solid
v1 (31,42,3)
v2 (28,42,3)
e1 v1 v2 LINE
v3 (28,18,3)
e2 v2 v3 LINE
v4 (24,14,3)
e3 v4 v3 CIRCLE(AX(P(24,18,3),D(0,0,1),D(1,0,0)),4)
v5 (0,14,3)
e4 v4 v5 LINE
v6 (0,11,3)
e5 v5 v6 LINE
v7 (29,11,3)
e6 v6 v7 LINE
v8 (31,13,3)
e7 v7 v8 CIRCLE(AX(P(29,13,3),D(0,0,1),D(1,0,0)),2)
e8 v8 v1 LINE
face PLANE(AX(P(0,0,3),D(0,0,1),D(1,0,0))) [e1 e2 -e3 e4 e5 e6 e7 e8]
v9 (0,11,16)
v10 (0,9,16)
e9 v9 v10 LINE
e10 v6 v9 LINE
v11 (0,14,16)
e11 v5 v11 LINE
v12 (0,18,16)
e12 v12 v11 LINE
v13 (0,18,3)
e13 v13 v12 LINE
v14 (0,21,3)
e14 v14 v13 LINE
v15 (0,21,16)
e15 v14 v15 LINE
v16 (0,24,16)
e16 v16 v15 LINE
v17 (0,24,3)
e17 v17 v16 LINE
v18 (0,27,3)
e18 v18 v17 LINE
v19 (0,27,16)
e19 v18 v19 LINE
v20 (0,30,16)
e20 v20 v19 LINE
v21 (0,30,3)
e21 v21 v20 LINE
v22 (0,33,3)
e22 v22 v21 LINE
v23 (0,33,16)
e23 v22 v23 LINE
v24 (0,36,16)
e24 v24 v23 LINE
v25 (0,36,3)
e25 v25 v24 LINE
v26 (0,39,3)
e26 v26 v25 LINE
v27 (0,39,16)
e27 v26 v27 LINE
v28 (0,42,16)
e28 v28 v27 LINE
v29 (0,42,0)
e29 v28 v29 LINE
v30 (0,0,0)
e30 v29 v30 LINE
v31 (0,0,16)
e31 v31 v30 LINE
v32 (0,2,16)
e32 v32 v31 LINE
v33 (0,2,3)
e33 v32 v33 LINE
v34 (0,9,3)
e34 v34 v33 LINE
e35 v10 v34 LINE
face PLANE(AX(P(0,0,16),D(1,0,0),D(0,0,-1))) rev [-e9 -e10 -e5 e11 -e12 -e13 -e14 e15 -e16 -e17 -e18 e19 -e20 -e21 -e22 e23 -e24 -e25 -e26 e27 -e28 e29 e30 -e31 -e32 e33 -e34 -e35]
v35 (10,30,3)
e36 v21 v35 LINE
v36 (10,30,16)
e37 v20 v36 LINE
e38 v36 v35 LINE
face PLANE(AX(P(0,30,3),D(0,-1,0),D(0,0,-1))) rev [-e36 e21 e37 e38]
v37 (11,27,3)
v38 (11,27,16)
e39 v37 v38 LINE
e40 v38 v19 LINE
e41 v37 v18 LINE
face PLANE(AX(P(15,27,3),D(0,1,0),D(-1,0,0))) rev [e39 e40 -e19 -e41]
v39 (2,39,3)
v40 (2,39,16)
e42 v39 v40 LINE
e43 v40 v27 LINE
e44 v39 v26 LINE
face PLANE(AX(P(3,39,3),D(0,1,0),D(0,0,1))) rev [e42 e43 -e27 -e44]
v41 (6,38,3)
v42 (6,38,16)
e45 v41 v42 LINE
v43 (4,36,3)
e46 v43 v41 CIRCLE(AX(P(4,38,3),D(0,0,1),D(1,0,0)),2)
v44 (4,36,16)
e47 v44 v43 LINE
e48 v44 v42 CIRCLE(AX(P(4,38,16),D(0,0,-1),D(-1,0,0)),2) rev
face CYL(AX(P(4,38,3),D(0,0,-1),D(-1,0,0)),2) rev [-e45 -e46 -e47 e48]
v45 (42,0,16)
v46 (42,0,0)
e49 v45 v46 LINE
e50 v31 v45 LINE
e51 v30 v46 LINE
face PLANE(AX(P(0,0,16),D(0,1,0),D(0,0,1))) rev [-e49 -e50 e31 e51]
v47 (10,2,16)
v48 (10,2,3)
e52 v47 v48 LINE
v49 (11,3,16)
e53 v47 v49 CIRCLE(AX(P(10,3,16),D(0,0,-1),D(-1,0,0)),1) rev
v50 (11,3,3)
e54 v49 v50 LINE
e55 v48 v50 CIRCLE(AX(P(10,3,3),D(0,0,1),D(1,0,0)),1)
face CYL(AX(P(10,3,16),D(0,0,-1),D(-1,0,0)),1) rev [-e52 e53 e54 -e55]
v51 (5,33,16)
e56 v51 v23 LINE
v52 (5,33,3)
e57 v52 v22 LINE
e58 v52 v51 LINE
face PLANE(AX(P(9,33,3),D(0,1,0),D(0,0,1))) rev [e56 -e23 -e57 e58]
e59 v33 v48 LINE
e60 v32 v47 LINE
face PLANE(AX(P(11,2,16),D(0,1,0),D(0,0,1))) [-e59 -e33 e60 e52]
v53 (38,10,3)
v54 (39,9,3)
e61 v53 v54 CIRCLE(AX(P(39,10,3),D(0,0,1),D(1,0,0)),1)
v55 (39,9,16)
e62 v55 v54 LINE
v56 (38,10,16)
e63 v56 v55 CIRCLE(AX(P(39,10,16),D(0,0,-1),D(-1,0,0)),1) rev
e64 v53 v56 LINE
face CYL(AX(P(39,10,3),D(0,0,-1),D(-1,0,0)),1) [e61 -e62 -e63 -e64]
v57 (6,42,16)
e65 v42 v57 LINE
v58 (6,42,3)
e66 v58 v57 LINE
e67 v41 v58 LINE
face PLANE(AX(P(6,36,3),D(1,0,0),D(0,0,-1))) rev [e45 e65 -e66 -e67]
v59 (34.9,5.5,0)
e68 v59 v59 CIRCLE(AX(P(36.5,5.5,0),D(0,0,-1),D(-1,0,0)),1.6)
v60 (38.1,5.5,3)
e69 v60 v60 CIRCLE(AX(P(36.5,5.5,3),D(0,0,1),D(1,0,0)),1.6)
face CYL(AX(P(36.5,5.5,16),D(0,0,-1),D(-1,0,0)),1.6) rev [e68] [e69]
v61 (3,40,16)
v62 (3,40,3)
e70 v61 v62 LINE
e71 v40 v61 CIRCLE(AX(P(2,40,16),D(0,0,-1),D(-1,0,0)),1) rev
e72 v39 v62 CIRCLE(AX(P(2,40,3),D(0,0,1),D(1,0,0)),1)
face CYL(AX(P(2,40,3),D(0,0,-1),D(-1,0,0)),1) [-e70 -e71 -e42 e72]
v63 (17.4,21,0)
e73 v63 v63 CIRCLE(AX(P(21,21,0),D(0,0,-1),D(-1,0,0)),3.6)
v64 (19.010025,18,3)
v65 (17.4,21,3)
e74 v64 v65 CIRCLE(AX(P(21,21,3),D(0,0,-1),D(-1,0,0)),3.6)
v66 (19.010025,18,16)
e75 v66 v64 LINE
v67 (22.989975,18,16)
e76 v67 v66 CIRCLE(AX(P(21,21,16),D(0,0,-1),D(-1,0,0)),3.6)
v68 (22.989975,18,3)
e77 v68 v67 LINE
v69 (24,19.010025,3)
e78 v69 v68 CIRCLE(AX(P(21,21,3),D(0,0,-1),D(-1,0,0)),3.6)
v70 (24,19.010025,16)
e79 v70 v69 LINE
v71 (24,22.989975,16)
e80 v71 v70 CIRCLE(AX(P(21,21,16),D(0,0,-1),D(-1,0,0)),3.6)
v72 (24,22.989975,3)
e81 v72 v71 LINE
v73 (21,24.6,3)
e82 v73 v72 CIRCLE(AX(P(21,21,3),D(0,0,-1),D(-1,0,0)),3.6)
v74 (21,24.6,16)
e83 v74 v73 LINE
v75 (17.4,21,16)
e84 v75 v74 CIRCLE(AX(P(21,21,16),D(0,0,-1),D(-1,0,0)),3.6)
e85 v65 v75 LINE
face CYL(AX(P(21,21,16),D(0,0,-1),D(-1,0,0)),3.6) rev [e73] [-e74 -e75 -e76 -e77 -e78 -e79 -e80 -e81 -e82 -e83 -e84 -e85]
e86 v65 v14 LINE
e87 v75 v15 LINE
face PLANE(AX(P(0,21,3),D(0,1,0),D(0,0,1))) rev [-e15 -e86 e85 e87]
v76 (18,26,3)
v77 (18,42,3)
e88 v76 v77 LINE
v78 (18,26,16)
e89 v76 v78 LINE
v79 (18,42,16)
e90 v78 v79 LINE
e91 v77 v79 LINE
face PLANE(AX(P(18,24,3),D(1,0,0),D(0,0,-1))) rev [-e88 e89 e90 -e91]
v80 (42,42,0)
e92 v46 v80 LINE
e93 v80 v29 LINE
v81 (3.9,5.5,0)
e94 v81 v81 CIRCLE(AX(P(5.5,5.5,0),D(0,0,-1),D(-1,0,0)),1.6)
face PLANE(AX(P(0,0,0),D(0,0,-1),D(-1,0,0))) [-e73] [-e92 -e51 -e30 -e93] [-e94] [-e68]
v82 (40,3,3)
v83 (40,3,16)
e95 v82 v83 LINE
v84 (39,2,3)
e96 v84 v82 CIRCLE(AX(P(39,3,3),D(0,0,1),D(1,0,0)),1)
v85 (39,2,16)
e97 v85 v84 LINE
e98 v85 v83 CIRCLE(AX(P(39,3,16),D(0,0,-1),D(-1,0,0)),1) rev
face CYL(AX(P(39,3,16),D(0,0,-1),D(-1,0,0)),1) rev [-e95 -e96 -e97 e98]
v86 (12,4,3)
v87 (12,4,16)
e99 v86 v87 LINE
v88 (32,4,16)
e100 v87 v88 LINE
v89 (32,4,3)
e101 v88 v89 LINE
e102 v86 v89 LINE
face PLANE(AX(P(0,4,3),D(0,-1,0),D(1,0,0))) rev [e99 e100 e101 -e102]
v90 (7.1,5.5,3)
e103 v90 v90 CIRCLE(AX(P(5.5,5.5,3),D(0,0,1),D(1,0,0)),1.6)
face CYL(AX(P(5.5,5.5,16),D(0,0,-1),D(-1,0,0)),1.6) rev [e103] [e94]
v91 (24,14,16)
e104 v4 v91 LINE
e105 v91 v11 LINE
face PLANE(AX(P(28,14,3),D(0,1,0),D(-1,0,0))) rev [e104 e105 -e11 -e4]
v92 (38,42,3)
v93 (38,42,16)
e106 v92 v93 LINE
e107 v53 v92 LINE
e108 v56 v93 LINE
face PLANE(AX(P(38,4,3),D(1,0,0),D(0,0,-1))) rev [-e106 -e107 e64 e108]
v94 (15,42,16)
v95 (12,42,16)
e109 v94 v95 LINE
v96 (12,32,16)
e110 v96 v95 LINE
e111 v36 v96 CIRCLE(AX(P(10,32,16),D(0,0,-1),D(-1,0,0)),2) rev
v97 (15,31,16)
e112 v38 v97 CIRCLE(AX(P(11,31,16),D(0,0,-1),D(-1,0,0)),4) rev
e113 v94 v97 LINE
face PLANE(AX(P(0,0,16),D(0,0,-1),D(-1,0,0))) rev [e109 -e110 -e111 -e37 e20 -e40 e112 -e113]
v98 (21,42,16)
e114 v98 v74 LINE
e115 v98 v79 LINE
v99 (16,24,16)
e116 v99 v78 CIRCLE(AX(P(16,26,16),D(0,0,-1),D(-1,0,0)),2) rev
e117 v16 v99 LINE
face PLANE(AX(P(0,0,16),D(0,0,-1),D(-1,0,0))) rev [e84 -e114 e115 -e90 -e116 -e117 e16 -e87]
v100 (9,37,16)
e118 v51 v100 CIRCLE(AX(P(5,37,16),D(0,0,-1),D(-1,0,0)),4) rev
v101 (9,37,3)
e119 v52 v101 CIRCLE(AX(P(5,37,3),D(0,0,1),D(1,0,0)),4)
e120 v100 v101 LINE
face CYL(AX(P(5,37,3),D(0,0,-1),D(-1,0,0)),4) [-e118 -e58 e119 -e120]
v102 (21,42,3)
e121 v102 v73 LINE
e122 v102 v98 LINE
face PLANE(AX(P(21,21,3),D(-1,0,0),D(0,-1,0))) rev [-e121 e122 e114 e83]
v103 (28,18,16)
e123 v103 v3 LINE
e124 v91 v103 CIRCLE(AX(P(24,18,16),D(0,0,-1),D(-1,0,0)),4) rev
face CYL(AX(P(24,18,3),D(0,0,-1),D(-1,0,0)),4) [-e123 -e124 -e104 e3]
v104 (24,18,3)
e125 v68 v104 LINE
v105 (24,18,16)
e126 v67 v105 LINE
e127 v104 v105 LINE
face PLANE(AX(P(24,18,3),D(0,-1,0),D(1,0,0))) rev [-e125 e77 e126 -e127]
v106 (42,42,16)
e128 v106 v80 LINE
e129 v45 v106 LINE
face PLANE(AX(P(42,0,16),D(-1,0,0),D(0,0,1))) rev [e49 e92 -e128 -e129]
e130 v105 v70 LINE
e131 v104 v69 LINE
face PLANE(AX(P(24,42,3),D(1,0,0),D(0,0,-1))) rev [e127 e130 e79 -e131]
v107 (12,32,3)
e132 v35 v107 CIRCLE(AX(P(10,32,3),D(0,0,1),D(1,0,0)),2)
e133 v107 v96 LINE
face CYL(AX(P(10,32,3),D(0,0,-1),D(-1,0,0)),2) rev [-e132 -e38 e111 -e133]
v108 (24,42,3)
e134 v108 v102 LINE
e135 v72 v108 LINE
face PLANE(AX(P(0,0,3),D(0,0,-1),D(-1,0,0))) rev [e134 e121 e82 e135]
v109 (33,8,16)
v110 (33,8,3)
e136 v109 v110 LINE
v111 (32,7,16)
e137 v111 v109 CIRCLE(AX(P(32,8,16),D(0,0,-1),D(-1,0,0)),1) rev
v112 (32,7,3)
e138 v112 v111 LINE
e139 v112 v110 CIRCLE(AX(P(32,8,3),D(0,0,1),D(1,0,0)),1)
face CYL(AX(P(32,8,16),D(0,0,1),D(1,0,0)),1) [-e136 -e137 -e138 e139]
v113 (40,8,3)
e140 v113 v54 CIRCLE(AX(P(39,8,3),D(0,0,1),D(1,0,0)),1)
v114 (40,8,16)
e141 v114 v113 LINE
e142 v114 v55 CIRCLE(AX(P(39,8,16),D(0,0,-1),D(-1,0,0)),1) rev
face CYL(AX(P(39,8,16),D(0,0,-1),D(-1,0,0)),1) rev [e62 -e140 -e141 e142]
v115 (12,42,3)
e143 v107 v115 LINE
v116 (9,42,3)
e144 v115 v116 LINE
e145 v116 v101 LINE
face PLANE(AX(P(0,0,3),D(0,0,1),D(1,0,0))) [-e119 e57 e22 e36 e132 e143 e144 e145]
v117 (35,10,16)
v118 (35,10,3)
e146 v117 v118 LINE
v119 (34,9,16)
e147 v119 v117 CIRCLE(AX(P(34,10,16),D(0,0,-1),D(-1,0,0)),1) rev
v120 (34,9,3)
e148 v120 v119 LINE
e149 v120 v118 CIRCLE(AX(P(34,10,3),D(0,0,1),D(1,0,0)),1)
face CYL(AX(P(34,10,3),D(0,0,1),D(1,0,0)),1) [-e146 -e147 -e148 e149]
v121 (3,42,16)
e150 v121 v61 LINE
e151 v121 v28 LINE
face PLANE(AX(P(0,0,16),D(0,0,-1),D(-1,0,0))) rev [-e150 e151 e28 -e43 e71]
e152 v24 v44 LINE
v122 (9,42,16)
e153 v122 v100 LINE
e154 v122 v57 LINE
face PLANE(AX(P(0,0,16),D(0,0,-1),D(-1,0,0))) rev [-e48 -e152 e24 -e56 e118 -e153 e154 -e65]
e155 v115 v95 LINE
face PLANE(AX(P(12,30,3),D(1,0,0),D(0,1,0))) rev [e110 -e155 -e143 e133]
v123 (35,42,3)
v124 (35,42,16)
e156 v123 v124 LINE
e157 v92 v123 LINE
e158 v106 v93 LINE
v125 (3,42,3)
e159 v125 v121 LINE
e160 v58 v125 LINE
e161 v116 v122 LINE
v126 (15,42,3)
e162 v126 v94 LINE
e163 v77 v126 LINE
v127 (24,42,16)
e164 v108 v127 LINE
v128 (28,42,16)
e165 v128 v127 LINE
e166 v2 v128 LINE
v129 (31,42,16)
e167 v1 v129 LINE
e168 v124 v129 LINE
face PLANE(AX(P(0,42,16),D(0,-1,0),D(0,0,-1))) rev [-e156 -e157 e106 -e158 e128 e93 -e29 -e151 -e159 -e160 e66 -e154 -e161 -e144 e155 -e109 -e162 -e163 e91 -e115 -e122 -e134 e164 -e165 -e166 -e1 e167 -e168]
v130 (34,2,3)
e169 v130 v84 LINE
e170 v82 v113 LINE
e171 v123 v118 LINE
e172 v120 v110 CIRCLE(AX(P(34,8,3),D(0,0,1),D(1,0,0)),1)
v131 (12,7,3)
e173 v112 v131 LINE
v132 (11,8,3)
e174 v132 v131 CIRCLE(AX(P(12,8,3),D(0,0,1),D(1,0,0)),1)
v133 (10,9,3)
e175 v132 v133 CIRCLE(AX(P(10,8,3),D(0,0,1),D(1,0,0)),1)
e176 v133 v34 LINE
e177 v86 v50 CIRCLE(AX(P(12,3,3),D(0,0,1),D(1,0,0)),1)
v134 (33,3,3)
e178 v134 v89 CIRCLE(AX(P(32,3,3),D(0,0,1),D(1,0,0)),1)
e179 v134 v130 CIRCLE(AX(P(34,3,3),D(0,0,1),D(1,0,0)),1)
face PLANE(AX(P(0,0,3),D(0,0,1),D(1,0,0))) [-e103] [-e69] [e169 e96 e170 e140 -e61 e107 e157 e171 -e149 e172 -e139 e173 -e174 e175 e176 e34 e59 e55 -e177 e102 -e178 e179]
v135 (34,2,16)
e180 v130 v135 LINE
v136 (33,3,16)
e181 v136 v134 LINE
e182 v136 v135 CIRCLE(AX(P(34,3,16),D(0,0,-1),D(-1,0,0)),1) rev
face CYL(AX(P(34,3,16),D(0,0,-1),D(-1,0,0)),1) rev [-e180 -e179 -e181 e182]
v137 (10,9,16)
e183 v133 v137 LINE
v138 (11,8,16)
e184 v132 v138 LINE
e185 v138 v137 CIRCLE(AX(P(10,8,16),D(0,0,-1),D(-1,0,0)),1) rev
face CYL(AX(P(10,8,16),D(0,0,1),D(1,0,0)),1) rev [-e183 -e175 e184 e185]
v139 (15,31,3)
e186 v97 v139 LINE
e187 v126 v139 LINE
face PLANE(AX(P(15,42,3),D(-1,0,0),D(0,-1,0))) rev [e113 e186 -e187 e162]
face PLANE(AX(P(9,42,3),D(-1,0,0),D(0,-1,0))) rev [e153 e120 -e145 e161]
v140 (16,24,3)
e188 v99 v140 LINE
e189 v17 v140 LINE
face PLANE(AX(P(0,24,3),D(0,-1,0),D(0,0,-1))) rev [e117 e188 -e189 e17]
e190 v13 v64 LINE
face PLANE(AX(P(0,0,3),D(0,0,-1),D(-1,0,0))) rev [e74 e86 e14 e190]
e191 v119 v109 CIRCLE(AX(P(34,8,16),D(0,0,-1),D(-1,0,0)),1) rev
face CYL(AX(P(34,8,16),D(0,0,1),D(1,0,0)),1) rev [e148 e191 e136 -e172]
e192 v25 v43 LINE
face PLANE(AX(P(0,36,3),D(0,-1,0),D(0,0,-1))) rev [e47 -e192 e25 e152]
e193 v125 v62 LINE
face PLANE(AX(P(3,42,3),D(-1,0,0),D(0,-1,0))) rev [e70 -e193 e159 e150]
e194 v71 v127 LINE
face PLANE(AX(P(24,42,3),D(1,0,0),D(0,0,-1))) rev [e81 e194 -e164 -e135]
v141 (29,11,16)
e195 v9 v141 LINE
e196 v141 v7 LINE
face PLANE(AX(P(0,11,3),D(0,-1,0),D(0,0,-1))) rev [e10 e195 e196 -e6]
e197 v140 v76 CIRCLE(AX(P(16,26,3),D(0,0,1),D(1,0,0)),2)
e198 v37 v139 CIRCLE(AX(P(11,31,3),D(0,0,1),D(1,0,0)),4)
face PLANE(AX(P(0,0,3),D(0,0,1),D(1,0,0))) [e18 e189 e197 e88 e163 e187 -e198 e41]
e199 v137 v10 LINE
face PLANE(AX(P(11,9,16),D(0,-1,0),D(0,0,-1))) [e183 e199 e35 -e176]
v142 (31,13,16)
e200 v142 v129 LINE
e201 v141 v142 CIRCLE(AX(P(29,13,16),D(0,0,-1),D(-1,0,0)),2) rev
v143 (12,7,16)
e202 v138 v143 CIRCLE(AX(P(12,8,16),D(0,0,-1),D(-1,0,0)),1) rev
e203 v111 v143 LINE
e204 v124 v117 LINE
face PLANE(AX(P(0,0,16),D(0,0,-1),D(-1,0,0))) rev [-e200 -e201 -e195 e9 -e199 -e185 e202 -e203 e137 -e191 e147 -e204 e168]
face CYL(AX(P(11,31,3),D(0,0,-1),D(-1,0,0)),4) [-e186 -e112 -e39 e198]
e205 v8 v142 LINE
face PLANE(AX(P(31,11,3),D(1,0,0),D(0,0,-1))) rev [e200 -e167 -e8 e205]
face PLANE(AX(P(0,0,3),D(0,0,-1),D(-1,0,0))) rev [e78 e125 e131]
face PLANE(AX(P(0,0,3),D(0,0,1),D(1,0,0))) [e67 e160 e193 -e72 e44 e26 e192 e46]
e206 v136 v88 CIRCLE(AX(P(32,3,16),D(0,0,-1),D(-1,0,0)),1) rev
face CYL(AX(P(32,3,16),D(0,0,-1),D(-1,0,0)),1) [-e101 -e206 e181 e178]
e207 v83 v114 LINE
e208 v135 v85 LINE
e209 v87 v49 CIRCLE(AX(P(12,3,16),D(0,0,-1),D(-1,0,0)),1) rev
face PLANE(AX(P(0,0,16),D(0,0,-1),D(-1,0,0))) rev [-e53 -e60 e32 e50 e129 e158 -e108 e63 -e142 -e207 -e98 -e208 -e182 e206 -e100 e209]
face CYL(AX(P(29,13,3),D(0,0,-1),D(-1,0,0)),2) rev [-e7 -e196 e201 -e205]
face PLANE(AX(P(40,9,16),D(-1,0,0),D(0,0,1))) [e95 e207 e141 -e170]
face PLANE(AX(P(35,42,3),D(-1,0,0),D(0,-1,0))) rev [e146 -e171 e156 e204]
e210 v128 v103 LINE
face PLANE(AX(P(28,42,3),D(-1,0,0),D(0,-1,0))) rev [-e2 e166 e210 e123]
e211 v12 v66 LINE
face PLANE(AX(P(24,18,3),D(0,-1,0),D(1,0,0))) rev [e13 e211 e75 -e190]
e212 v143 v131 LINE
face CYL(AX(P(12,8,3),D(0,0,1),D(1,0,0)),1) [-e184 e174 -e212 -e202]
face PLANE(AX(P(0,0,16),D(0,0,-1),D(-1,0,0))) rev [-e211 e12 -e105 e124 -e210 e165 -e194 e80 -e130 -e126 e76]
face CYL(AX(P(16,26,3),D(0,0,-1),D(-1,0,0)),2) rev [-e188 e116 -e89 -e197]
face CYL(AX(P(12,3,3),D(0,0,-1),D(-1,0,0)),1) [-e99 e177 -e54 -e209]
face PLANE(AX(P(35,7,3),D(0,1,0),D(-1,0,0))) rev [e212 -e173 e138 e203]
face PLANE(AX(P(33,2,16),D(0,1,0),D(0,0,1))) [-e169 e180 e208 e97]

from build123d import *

# Parameters (mm, degrees)
SKETCH1_W           = 42
SKETCH1_H           = 42
BOSS_EXTRUDE1_DEPTH = 16
CUT_EXTRUDE1_DEPTH  = 13
SKETCH3_R           = 3.6
SKETCH3_R_2         = 1.6
CUT_EXTRUDE2_DEPTH  = 62.514225997
SKETCH4_W           = 11
SKETCH4_H           = 7
SKETCH4_W_2         = 7
CUT_EXTRUDE3_DEPTH  = 61.802960454
FILLET2_R           = 1
FILLET3_R           = 4
FILLET4_R           = 4
FILLET5_R           = 4
FILLET6_R           = 1
FILLET7_R           = 1
FILLET8_R           = 1
FILLET10_R          = 1
FILLET11_R          = 1
FILLET12_R          = 1
FILLET13_R          = 1
FILLET14_R          = 1
FILLET15_R          = 1
FILLET16_R          = 1
FILLET17_R          = 1
FILLET18_R          = 1
FILLET19_R          = 2
FILLET20_R          = 2
FILLET21_R          = 2
FILLET22_R          = 2


with BuildPart() as part:
    # Sketch1 → Boss-Extrude1 (new body)
    with BuildSketch(Plane.XY):
        with Locations((21, 21)):
            Rectangle(SKETCH1_W, SKETCH1_H)
    extrude(amount=BOSS_EXTRUDE1_DEPTH)

    # Sketch2 → Cut-Extrude1 (cut)
    with BuildSketch(Plane.XY.offset(16)):
        Polygon((3, 42), (3, 39), (0, 39), (0, 36), (6, 36), (6, 42), align=None)
        Polygon((9, 42), (9, 33), (0, 33), (0, 30), (12, 30), (12, 42), align=None)
        Polygon((15, 42), (15, 27), (0, 27), (0, 24), (18, 24), (18, 42), align=None)
        Polygon((0, 21), (21, 21), (21, 42), (24, 42), (24, 18), (0, 18), align=None)
        Polygon((28, 42), (28, 14), (0, 14), (0, 11), (31, 11), (31, 42), align=None)
        Polygon((35, 42), (35, 7), (0, 7), (0, 4), (38, 4), (38, 42), align=None)
    extrude(amount=-CUT_EXTRUDE1_DEPTH, mode=Mode.SUBTRACT)

    # Sketch3 → Cut-Extrude2 (cut, through all)
    with BuildSketch(Plane(origin=(0, 0, 0), x_dir=(-1, 0, 0), z_dir=(0, 0, -1))):
        with Locations((-21, 21)):
            Circle(SKETCH3_R)
        with Locations((-5.5, 5.5)):
            Circle(SKETCH3_R_2)
        with Locations((-36.5, 5.5)):
            Circle(SKETCH3_R_2)
    extrude(amount=-CUT_EXTRUDE2_DEPTH, mode=Mode.SUBTRACT)

    # Sketch4 → Cut-Extrude3 (cut, through all)
    with BuildSketch(Plane.XY.offset(3)):
        with Locations((5.5, 5.5)):
            Rectangle(SKETCH4_W, SKETCH4_H)
        with Locations((36.5, 5.5)):
            Rectangle(SKETCH4_W_2, SKETCH4_H)
    extrude(amount=CUT_EXTRUDE3_DEPTH, mode=Mode.SUBTRACT)

    # Fillet2
    fillet2_edges = [part.edges().sort_by_distance(p)[0] for p in [
        (3, 39, 9.5),
    ]]
    fillet(fillet2_edges, radius=FILLET2_R)

    # Fillet3
    fillet3_edges = [part.edges().sort_by_distance(p)[0] for p in [
        (9, 33, 9.5),
    ]]
    fillet(fillet3_edges, radius=FILLET3_R)

    # Fillet4
    fillet4_edges = [part.edges().sort_by_distance(p)[0] for p in [
        (15, 27, 9.5),
    ]]
    fillet(fillet4_edges, radius=FILLET4_R)

    # Fillet5
    fillet5_edges = [part.edges().sort_by_distance(p)[0] for p in [
        (28, 14, 9.5),
    ]]
    fillet(fillet5_edges, radius=FILLET5_R)

    # Fillet6
    fillet6_edges = [part.edges().sort_by_distance(p)[0] for p in [
        (35, 9, 9.5),
    ]]
    fillet(fillet6_edges, radius=FILLET6_R)

    # Fillet7
    fillet7_edges = [part.edges().sort_by_distance(p)[0] for p in [
        (33, 7, 9.5),
    ]]
    fillet(fillet7_edges, radius=FILLET7_R)

    # Fillet8
    fillet8_edges = [part.edges().sort_by_distance(p)[0] for p in [
        (40, 2, 9.5),
    ]]
    fillet(fillet8_edges, radius=FILLET8_R)

    # Fillet10
    fillet10_edges = [part.edges().sort_by_distance(p)[0] for p in [
        (33, 9, 9.5),
    ]]
    fillet(fillet10_edges, radius=FILLET10_R - 0.0001)  # a hair under: the kernel refuses the full size

    # Fillet11
    fillet11_edges = [part.edges().sort_by_distance(p)[0] for p in [
        (38, 9, 9.5),
    ]]
    fillet(fillet11_edges, radius=FILLET11_R)

    # Fillet12
    fillet12_edges = [part.edges().sort_by_distance(p)[0] for p in [
        (40, 9, 9.5),
    ]]
    fillet(fillet12_edges, radius=FILLET12_R - 0.0001)  # a hair under: the kernel refuses the full size

    # Fillet13
    fillet13_edges = [part.edges().sort_by_distance(p)[0] for p in [
        (33, 2, 9.5),
    ]]
    fillet(fillet13_edges, radius=FILLET13_R)

    # Fillet14
    fillet14_edges = [part.edges().sort_by_distance(p)[0] for p in [
        (33, 4, 9.5),
    ]]
    fillet(fillet14_edges, radius=FILLET14_R - 0.0001)  # a hair under: the kernel refuses the full size

    # Fillet15
    fillet15_edges = [part.edges().sort_by_distance(p)[0] for p in [
        (11, 4, 9.5),
    ]]
    fillet(fillet15_edges, radius=FILLET15_R)

    # Fillet16
    fillet16_edges = [part.edges().sort_by_distance(p)[0] for p in [
        (11, 2, 9.5),
    ]]
    fillet(fillet16_edges, radius=FILLET16_R - 0.0001)  # a hair under: the kernel refuses the full size

    # Fillet17
    fillet17_edges = [part.edges().sort_by_distance(p)[0] for p in [
        (11, 7, 9.5),
    ]]
    fillet(fillet17_edges, radius=FILLET17_R)

    # Fillet18
    fillet18_edges = [part.edges().sort_by_distance(p)[0] for p in [
        (11, 9, 9.5),
    ]]
    fillet(fillet18_edges, radius=FILLET18_R - 0.0001)  # a hair under: the kernel refuses the full size

    # Fillet19
    fillet19_edges = [part.edges().sort_by_distance(p)[0] for p in [
        (6, 36, 9.5),
    ]]
    fillet(fillet19_edges, radius=FILLET19_R)

    # Fillet20
    fillet20_edges = [part.edges().sort_by_distance(p)[0] for p in [
        (12, 30, 9.5),
    ]]
    fillet(fillet20_edges, radius=FILLET20_R)

    # Fillet21
    fillet21_edges = [part.edges().sort_by_distance(p)[0] for p in [
        (18, 24, 9.5),
    ]]
    fillet(fillet21_edges, radius=FILLET21_R)

    # Fillet22
    fillet22_edges = [part.edges().sort_by_distance(p)[0] for p in [
        (31, 11, 9.5),
    ]]
    fillet(fillet22_edges, radius=FILLET22_R)


solid = part.part
